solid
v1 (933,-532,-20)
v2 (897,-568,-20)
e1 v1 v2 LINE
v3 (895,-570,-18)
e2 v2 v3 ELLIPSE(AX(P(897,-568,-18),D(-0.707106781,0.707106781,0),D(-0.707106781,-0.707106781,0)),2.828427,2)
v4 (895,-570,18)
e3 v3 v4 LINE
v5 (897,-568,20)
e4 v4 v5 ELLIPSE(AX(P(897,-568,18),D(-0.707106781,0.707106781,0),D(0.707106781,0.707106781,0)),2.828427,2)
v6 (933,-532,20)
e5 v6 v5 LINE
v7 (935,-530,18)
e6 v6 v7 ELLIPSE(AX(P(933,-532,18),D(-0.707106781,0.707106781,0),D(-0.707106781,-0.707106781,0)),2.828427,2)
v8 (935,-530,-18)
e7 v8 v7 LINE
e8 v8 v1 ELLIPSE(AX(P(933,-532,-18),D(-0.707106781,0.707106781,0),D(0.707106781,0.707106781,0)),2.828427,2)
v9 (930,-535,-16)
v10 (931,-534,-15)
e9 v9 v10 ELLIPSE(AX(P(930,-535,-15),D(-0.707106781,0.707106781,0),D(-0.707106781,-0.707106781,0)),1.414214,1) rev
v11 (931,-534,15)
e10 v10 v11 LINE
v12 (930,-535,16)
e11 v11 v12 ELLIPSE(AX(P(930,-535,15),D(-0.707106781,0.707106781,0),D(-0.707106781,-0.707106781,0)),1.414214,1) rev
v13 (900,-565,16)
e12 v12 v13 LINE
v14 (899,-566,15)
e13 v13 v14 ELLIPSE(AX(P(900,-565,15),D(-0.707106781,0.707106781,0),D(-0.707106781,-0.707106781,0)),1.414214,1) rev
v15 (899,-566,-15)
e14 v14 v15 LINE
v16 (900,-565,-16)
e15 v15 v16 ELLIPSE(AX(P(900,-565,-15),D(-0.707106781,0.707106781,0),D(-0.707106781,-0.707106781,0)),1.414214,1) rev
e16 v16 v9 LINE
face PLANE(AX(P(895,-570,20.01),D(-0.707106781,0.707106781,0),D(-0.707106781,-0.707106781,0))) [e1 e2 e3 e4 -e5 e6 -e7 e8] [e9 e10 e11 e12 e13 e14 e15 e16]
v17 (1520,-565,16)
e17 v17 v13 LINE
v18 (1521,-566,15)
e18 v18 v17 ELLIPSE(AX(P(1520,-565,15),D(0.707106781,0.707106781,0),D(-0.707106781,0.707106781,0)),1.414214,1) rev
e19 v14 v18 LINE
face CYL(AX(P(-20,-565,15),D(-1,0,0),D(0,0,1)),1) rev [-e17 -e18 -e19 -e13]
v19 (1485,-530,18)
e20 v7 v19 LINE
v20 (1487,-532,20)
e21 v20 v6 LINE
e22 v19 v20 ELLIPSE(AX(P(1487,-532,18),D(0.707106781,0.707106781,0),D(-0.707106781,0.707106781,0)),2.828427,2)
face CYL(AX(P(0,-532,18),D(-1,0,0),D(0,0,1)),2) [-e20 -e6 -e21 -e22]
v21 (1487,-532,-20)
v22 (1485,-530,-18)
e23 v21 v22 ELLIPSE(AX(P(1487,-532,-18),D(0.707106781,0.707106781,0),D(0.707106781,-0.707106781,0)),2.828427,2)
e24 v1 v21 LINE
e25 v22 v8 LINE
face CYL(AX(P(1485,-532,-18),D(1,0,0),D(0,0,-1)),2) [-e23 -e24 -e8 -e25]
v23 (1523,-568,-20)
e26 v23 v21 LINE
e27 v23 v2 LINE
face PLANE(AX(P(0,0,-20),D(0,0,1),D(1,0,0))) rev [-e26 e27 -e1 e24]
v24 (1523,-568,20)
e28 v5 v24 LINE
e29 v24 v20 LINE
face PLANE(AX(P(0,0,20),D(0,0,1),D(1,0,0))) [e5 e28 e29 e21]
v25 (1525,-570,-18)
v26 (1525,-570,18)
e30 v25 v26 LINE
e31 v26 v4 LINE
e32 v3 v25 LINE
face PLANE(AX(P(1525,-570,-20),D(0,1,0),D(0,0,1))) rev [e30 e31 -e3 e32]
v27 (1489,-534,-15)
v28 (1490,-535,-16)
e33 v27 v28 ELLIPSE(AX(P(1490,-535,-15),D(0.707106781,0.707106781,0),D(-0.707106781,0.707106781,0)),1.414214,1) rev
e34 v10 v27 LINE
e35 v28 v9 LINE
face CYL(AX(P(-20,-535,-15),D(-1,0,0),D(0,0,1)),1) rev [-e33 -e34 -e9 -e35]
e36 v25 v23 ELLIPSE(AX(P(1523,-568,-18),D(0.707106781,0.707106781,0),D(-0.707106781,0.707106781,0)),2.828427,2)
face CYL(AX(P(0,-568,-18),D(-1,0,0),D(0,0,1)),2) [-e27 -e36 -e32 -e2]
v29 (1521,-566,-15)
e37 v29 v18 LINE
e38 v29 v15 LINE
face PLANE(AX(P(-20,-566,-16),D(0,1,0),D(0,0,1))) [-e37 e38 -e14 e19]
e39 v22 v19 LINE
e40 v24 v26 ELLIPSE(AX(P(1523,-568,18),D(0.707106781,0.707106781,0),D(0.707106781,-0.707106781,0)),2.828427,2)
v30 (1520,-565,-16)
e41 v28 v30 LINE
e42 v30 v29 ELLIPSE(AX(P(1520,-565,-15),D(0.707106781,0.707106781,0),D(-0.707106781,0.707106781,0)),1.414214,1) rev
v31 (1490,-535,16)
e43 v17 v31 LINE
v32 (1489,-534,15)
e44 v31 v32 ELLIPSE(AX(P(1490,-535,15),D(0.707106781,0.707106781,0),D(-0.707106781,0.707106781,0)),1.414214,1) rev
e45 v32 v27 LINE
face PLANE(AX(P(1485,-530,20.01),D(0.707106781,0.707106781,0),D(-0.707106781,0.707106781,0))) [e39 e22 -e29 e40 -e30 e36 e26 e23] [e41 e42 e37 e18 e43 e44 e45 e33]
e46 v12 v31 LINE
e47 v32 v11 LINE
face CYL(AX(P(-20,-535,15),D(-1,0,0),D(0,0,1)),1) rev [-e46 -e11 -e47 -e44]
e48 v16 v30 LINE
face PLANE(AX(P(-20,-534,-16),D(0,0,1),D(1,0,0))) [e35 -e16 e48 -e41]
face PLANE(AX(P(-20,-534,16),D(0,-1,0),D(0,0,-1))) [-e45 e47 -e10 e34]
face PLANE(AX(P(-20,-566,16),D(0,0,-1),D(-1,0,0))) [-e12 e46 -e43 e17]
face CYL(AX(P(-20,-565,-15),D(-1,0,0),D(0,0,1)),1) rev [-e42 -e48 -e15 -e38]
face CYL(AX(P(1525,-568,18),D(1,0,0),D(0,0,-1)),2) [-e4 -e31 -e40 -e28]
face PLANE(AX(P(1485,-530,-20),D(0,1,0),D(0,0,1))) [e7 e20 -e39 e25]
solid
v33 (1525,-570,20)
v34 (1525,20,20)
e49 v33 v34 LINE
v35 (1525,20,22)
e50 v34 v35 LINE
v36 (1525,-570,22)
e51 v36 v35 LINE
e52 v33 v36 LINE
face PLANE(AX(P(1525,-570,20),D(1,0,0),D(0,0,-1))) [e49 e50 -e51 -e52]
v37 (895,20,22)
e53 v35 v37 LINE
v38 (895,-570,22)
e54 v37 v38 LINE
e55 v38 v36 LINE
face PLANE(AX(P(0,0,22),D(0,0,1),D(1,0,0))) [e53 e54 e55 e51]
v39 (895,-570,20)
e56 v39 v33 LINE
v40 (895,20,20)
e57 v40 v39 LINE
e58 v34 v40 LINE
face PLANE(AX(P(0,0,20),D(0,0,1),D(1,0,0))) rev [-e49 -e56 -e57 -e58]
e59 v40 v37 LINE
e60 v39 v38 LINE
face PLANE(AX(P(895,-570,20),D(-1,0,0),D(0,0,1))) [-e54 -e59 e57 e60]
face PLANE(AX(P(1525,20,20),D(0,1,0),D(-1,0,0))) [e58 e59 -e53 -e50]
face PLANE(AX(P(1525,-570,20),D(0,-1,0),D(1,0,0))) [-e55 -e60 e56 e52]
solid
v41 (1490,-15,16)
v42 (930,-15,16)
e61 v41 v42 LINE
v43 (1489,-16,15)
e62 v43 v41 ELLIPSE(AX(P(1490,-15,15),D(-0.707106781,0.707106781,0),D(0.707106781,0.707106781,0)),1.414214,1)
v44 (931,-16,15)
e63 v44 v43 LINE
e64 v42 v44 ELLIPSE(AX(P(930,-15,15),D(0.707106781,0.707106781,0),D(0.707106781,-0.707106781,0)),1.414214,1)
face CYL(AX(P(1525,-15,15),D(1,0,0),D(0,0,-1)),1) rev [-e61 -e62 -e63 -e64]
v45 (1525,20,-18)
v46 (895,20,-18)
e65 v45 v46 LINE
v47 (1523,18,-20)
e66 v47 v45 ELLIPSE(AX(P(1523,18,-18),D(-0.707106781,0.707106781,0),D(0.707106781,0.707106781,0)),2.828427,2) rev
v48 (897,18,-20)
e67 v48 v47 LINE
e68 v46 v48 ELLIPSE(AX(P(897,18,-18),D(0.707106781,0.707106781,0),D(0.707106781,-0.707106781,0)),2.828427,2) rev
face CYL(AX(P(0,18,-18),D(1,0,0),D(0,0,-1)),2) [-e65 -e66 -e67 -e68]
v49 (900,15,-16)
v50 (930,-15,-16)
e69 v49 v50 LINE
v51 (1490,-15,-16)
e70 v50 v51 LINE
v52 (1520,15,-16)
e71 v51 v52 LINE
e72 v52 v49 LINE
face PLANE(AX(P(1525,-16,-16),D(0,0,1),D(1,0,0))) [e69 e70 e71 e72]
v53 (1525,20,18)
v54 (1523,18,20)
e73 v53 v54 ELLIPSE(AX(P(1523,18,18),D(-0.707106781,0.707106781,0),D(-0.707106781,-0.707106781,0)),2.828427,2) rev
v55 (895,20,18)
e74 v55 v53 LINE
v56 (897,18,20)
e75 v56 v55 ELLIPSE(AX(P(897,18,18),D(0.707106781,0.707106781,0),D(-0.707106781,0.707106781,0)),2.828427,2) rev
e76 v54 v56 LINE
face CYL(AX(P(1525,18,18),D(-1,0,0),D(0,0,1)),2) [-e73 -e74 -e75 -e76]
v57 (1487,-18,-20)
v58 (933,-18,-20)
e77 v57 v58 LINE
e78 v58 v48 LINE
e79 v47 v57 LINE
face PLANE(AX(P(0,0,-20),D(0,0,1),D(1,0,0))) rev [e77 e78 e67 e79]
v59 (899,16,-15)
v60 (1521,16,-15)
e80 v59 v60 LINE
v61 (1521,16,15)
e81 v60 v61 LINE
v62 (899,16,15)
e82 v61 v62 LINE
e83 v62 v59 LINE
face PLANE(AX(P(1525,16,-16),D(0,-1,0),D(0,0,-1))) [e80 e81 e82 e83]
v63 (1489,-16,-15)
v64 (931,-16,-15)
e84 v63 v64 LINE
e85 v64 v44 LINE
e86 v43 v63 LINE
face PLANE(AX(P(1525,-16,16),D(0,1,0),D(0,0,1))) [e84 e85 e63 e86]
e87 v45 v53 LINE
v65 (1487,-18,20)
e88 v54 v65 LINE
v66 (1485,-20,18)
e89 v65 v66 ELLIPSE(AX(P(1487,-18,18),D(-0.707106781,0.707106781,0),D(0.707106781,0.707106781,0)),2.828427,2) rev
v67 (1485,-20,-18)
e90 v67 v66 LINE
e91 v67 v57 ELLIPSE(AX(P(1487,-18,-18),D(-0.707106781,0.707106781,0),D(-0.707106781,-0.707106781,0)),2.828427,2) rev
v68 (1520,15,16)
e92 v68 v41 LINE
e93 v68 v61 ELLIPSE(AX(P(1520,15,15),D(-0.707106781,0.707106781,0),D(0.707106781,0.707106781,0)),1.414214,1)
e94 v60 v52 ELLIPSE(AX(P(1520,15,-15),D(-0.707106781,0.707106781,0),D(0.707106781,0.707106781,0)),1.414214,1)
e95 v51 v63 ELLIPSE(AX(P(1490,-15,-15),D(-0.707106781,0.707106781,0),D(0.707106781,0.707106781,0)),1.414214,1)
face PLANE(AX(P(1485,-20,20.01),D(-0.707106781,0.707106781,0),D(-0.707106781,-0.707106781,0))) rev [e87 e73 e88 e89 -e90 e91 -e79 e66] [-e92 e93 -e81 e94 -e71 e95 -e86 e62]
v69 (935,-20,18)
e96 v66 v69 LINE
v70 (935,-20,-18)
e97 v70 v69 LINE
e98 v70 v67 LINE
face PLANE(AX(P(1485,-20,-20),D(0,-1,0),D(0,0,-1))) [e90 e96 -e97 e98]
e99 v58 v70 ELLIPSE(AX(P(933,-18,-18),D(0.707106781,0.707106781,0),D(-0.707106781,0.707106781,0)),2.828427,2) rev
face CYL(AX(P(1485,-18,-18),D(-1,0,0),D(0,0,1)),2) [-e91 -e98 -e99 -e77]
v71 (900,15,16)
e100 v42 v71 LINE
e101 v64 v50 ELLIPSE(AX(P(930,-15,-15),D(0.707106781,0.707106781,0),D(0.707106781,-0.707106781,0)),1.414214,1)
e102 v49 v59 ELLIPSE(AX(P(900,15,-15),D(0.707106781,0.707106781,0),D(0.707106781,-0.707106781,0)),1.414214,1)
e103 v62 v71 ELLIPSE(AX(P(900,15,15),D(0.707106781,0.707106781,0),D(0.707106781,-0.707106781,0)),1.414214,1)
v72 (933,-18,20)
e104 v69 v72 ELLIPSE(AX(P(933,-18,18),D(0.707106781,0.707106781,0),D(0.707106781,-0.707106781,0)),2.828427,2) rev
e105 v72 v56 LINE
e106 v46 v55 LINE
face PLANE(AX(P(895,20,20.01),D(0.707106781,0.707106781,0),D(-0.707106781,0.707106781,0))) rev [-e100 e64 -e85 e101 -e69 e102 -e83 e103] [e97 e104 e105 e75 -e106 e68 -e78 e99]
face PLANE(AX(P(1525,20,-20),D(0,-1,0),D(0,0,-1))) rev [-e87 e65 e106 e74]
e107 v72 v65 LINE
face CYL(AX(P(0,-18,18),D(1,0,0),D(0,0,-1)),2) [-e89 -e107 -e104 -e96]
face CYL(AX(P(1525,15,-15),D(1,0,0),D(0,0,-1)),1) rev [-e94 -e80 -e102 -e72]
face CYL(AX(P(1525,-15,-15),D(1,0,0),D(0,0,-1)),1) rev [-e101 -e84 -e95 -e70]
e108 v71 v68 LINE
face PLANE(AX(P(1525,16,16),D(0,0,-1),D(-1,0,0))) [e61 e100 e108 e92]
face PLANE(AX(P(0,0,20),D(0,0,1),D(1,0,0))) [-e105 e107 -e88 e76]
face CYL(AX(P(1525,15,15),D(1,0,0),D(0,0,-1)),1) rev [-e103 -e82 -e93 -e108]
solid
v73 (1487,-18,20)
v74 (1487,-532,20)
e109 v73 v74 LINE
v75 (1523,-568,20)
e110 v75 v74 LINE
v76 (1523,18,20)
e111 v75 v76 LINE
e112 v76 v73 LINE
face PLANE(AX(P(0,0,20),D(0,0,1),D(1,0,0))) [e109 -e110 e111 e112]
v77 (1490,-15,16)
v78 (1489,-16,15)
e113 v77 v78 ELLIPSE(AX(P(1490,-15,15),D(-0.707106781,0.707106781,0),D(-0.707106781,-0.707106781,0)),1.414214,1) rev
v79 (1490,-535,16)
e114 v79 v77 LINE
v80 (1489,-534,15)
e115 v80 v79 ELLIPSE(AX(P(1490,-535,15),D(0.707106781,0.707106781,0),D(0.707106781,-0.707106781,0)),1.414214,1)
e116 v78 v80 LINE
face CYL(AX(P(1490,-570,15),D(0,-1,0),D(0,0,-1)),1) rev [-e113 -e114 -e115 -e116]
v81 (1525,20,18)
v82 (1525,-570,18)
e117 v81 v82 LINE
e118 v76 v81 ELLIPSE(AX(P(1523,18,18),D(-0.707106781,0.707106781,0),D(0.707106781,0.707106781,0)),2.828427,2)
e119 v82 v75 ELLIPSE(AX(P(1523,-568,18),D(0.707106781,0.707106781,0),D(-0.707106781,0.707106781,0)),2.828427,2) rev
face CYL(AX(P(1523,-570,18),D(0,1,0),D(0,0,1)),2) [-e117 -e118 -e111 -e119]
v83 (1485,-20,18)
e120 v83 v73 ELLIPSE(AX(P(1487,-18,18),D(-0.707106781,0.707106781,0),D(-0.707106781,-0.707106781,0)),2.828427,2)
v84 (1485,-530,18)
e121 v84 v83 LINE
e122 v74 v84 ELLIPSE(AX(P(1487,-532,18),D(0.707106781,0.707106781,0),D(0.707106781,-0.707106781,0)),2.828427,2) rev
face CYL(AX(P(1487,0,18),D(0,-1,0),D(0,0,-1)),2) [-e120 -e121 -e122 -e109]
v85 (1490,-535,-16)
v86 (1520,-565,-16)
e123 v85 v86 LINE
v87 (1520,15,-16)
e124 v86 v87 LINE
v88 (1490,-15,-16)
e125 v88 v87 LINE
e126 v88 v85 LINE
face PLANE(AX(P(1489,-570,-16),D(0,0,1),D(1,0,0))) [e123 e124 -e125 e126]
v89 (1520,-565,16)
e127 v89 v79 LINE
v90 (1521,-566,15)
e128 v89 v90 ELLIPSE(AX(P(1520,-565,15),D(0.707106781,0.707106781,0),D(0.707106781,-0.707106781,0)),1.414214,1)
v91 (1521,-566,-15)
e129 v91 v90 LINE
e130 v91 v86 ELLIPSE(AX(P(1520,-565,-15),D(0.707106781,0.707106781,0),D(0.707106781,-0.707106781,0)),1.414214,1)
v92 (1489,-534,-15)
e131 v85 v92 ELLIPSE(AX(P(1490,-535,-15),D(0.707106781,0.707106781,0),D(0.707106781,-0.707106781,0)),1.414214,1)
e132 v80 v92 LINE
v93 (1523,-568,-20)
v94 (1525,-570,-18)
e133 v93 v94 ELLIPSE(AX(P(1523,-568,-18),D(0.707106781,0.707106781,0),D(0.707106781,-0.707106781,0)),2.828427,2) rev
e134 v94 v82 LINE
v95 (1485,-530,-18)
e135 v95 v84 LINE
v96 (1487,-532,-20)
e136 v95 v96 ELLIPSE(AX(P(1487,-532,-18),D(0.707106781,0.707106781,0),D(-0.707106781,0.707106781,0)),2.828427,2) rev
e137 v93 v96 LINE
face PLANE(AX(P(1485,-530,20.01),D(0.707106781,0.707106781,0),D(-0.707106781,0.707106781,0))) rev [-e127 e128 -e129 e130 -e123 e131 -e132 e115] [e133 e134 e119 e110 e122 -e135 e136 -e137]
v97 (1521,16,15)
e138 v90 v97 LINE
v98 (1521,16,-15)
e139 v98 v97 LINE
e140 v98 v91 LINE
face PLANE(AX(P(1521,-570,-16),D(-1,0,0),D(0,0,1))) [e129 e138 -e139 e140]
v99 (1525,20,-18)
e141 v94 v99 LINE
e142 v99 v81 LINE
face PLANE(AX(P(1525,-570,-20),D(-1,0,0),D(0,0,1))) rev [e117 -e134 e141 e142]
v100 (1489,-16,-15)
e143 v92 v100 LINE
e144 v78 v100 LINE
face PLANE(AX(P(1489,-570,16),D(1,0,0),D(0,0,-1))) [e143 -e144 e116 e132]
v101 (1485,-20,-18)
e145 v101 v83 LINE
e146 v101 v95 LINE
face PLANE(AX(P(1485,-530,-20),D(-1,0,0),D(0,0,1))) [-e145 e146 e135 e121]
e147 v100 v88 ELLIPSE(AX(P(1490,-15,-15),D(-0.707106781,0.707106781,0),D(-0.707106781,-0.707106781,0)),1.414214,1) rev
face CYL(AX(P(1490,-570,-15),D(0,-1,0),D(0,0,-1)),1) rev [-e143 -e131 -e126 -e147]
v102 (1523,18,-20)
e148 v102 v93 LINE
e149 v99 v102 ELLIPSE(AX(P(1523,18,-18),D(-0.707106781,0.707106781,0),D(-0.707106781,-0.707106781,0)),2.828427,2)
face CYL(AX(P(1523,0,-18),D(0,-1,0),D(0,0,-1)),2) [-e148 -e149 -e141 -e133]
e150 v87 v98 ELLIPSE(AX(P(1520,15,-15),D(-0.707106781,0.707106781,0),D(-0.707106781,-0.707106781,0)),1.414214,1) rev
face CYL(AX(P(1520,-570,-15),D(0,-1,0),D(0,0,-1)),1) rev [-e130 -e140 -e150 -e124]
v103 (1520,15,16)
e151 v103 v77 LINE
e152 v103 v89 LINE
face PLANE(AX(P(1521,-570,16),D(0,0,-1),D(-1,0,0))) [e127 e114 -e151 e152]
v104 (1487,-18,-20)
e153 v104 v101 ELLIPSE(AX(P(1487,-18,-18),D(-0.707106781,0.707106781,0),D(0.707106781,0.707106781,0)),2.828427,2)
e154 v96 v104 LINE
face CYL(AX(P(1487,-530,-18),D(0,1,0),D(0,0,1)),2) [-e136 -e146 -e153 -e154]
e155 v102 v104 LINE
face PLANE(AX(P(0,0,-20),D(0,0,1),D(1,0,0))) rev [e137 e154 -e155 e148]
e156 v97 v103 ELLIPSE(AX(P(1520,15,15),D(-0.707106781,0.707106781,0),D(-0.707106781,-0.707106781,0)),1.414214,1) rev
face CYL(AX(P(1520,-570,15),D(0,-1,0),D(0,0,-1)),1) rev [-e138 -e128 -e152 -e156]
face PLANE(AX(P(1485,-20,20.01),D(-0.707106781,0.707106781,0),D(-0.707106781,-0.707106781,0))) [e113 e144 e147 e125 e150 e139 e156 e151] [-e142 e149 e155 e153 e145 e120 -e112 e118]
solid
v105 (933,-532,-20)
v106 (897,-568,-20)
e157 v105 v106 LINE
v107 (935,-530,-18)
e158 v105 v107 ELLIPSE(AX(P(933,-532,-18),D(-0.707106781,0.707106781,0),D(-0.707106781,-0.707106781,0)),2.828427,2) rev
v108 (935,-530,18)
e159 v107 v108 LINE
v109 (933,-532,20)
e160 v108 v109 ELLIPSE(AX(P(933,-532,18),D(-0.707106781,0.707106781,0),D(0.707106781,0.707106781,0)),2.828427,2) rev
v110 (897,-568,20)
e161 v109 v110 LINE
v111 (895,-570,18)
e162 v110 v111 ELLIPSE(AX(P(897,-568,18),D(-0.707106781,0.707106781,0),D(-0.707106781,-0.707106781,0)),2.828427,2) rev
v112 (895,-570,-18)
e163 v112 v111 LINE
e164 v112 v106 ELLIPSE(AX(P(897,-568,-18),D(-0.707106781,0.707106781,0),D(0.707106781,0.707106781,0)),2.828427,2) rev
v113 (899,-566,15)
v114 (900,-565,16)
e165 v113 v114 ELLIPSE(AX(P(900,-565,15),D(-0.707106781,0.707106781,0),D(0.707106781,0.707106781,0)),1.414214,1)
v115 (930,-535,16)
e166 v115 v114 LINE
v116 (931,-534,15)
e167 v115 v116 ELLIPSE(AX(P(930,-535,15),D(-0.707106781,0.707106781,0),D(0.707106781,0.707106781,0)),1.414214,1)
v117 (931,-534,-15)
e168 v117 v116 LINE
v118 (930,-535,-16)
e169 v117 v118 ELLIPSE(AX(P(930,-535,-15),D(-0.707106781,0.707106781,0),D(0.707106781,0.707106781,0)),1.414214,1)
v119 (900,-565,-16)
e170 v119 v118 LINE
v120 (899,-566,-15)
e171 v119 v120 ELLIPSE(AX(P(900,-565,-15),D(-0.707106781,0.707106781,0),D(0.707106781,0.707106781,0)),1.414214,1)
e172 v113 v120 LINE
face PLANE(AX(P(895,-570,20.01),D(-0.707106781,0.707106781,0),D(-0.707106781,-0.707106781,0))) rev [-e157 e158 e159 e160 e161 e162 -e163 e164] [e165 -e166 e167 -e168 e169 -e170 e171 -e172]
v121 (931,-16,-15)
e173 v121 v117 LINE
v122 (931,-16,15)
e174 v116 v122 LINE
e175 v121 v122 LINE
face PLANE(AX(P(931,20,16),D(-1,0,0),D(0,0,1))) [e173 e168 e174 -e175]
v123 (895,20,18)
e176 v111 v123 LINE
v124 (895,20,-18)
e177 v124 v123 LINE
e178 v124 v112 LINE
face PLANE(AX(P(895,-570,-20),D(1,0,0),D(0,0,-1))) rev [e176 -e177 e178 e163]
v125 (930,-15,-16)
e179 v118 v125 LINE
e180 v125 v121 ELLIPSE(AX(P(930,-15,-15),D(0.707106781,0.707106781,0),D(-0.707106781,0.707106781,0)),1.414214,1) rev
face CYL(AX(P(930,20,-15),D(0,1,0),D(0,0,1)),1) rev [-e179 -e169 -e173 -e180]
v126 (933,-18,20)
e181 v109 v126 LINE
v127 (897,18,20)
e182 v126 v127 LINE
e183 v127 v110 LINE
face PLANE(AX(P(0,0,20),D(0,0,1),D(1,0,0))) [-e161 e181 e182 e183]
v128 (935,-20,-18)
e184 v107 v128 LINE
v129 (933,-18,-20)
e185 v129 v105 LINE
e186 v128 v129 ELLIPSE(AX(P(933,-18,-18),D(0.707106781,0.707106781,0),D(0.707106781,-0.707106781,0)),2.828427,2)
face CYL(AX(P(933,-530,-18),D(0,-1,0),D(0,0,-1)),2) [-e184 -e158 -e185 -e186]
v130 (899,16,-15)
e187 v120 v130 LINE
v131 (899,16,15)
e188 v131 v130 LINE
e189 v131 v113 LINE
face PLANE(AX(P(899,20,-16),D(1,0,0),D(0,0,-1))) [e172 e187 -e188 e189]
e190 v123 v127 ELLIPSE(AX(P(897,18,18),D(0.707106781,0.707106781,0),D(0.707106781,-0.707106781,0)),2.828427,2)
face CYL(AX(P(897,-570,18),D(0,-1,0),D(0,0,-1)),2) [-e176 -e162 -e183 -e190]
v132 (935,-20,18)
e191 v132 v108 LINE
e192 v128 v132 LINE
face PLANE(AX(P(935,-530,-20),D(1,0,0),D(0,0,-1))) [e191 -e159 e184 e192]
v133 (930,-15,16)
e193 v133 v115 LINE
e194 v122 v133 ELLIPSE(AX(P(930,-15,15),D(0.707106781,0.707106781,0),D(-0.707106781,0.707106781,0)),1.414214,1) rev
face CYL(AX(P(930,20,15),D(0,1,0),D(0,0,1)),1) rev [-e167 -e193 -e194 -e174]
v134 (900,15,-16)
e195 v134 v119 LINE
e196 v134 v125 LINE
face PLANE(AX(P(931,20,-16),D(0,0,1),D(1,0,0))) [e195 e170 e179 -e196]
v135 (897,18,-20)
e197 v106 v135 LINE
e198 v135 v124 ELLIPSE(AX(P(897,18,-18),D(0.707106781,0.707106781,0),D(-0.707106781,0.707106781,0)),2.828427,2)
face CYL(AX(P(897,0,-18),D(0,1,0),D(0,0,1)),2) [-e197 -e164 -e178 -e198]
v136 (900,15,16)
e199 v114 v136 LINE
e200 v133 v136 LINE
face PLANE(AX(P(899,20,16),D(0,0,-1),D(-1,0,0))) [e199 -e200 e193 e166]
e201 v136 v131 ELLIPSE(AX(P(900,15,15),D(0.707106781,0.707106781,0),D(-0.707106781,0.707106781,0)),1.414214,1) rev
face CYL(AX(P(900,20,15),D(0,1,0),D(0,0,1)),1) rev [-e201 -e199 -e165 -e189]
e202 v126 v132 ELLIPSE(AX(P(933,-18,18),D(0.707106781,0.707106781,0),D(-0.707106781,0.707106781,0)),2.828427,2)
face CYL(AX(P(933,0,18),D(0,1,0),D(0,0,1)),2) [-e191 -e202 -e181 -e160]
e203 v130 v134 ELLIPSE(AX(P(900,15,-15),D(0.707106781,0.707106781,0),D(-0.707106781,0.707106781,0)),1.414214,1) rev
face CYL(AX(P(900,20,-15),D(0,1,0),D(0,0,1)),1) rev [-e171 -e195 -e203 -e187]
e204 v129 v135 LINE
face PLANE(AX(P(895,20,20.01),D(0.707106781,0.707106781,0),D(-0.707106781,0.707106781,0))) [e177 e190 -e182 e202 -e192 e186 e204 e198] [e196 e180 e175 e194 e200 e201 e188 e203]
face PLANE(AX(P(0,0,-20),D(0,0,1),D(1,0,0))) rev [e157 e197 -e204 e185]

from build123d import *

# Parameters (mm, degrees)
SKETCH_1_W                 = 630
SKETCH_1_H                 = 590
SM_BASE_FLANGE_1_DEPTH     = 2
SKETCH_4_W                 = 630
SKETCH_4_H                 = 590
SKETCH_4_W_2               = 550
SKETCH_4_H_2               = 510
EXTRUDE_1_DEPTH            = 40
SPLIT_START                = 229
SPLIT_BODIES_1_OUTLINE_W   = 418.911434438
SPLIT_BODIES_1_OUTLINE_H   = 40
SPLIT_BODIES_1_DEPTH       = 864
SPLIT_START_2              = 675.286976033
SPLIT_BODIES_1_2_OUTLINE_W = 447.088565562
SPLIT_BODIES_1_2_OUTLINE_H = 40
SPLIT_BODIES_1_2_DEPTH     = 417.713023967
SPLIT_START_3              = -20
SPLIT_BODIES_1_3_DEPTH     = 40
SPLIT_BODIES_1_4_DEPTH     = 40
SPLIT_BODIES_1_5_DEPTH     = 40
CUT_EXTRUDE_1_DEPTH        = 865.060183089
CUT_EXTRUDE_1_DEPTH_BACK   = 865.060183089
SKETCH_6_W                 = 32
SKETCH_6_H                 = 32
CUT_EXTRUDE_2_DEPTH        = 865.060183089
CUT_EXTRUDE_2_DEPTH_BACK   = 865.060183089
SKETCH_7_W                 = 32
SKETCH_7_H                 = 32
CUT_EXTRUDE_3_DEPTH        = 865.060183089
CUT_EXTRUDE_3_DEPTH_BACK   = 865.060183089
SKETCH_8_W                 = 32
SKETCH_8_H                 = 32
CUT_EXTRUDE_4_DEPTH        = 865.060183089
CUT_EXTRUDE_4_DEPTH_BACK   = 865.060183089
SKETCH_9_W                 = 32
SKETCH_9_H                 = 32
FILLET_1_R                 = 2
FILLET_2_R                 = 1
FILLET_3_R                 = 2
FILLET_4_R                 = 1
FILLET_5_R                 = 2
FILLET_6_R                 = 1
FILLET_7_R                 = 2
FILLET_8_R                 = 1


with BuildPart() as part:
    # 基体-法兰1: sheet metal written as solids
    # Sketch 1 → 基体-法兰1 (new body)
    with BuildSketch(Plane.XY.offset(22)):
        with Locations((1210, -275)):
            Rectangle(SKETCH_1_W, SKETCH_1_H)
    extrude(amount=-SM_BASE_FLANGE_1_DEPTH)


with BuildPart() as body_2:
    # 草图4 → 凸台-拉伸1 (new body)
    with BuildSketch(Plane(origin=(0, 0, 20), x_dir=(-1, 0, 0), z_dir=(0, 0, -1))):
        with Locations((-1210, -275)):
            Rectangle(SKETCH_4_W, SKETCH_4_H)
        with Locations((-1210, -275)):
            Rectangle(SKETCH_4_W_2, SKETCH_4_H_2, mode=Mode.SUBTRACT)
    extrude(amount=EXTRUDE_1_DEPTH)

    # Split Bodies 1: read off the stored shape, not the designer's step
    # Split Bodies 1 outline → Split Bodies 1 (cut)
    with BuildSketch(Plane(origin=(0, 0, 0), x_dir=(0.707106781186546, -0.707106781186549, 0), z_dir=(0.707106781186549, 0.707106781186546, 0)).offset(SPLIT_START)):
        with Locations((826.455717219, 0)):
            Rectangle(SPLIT_BODIES_1_OUTLINE_W, SPLIT_BODIES_1_OUTLINE_H)
    extrude(amount=SPLIT_BODIES_1_DEPTH, mode=Mode.SUBTRACT)

    # Split Bodies 1 2 outline → Split Bodies 1 2 (cut)
    with BuildSketch(Plane(origin=(0, 0, 0), x_dir=(0.707106781186546, -0.707106781186549, 0), z_dir=(0.707106781186549, 0.707106781186546, 0)).offset(SPLIT_START_2)):
        with Locations((1259.455717219, 0)):
            Rectangle(SPLIT_BODIES_1_2_OUTLINE_W, SPLIT_BODIES_1_2_OUTLINE_H)
    extrude(amount=SPLIT_BODIES_1_2_DEPTH, mode=Mode.SUBTRACT)

    # 草图6 → 切除-拉伸1 (cut, two sides: drawn at the far end of the back side and taken through both)
    with BuildSketch(Plane(origin=(1525, -570, 20), x_dir=(0, 0, 1), z_dir=(-1, 0, 0)).offset(-CUT_EXTRUDE_1_DEPTH_BACK)):
        with Locations((-20, 20)):
            Rectangle(SKETCH_6_W, SKETCH_6_H)
    extrude(amount=CUT_EXTRUDE_1_DEPTH + CUT_EXTRUDE_1_DEPTH_BACK, mode=Mode.SUBTRACT)

    # 圆角1
    fillet_1_edges = [body_2.edges().sort_by_distance(p)[0] for p in [
        (1210, -530, 20),
        (1210, -530, -20),
        (1210, -570, 20),
        (1210, -570, -20),
    ]]
    fillet(fillet_1_edges, radius=FILLET_1_R)

    # 圆角2
    fillet_2_edges = [body_2.edges().sort_by_distance(p)[0] for p in [
        (1210, -566, -16),
        (1210, -566, 16),
        (1210, -534, 16),
        (1210, -534, -16),
    ]]
    fillet(fillet_2_edges, radius=FILLET_2_R)


with BuildPart() as body_3:
    # Split Bodies 1 3 outline → Split Bodies 1 3 (new body)
    with BuildSketch(Plane.XY.offset(SPLIT_START_3)):
        Polygon((895, 20), (935, -20), (1485, -20), (1525, 20), align=None)
    extrude(amount=SPLIT_BODIES_1_3_DEPTH)

    # 草图9 → 切除-拉伸4 (cut, two sides: drawn at the far end of the back side and taken through both)
    with BuildSketch(Plane(origin=(895, 20, 20), x_dir=(0, 0, -1), z_dir=(1, 0, 0)).offset(-CUT_EXTRUDE_4_DEPTH_BACK)):
        with Locations((20, -20)):
            Rectangle(SKETCH_9_W, SKETCH_9_H)
    extrude(amount=CUT_EXTRUDE_4_DEPTH + CUT_EXTRUDE_4_DEPTH_BACK, mode=Mode.SUBTRACT)

    # 圆角7
    fillet_7_edges = [body_3.edges().sort_by_distance(p)[0] for p in [
        (1210, -20, 20),
        (1210, -20, -20),
        (1210, 20, 20),
        (1210, 20, -20),
    ]]
    fillet(fillet_7_edges, radius=FILLET_7_R)

    # 圆角8
    fillet_8_edges = [body_3.edges().sort_by_distance(p)[0] for p in [
        (1210, 16, -16),
        (1210, 16, 16),
        (1210, -16, 16),
        (1210, -16, -16),
    ]]
    fillet(fillet_8_edges, radius=FILLET_8_R)


with BuildPart() as body_4:
    # Split Bodies 1 4 outline → Split Bodies 1 4 (new body)
    with BuildSketch(Plane.XY.offset(SPLIT_START_3)):
        Polygon((1485, -530), (1525, -570), (1525, 20), (1485, -20), align=None)
    extrude(amount=SPLIT_BODIES_1_4_DEPTH)

    # 草图7 → 切除-拉伸2 (cut, two sides: drawn at the far end of the back side and taken through both)
    with BuildSketch(Plane(origin=(1525, 20, 20), x_dir=(-1, 0, 0), z_dir=(0, -1, 0)).offset(-CUT_EXTRUDE_2_DEPTH_BACK)):
        with Locations((20, 20)):
            Rectangle(SKETCH_7_W, SKETCH_7_H)
    extrude(amount=CUT_EXTRUDE_2_DEPTH + CUT_EXTRUDE_2_DEPTH_BACK, mode=Mode.SUBTRACT)

    # 圆角3
    fillet_3_edges = [body_4.edges().sort_by_distance(p)[0] for p in [
        (1485, -275, 20),
        (1485, -275, -20),
        (1525, -275, 20),
        (1525, -275, -20),
    ]]
    fillet(fillet_3_edges, radius=FILLET_3_R)

    # 圆角4
    fillet_4_edges = [body_4.edges().sort_by_distance(p)[0] for p in [
        (1521, -275, -16),
        (1521, -275, 16),
        (1489, -275, 16),
        (1489, -275, -16),
    ]]
    fillet(fillet_4_edges, radius=FILLET_4_R)


with BuildPart() as body_5:
    # Split Bodies 1 5 outline → Split Bodies 1 5 (new body)
    with BuildSketch(Plane.XY.offset(SPLIT_START_3)):
        Polygon((895, -570), (935, -530), (935, -20), (895, 20), align=None)
    extrude(amount=SPLIT_BODIES_1_5_DEPTH)

    # 草图8 → 切除-拉伸3 (cut, two sides: drawn at the far end of the back side and taken through both)
    with BuildSketch(Plane(origin=(895, -570, 20), x_dir=(1, 0, 0), z_dir=(0, 1, 0)).offset(-CUT_EXTRUDE_3_DEPTH_BACK)):
        with Locations((20, 20)):
            Rectangle(SKETCH_8_W, SKETCH_8_H)
    extrude(amount=CUT_EXTRUDE_3_DEPTH + CUT_EXTRUDE_3_DEPTH_BACK, mode=Mode.SUBTRACT)

    # 圆角5
    fillet_5_edges = [body_5.edges().sort_by_distance(p)[0] for p in [
        (935, -275, 20),
        (935, -275, -20),
        (895, -275, -20),
        (895, -275, 20),
    ]]
    fillet(fillet_5_edges, radius=FILLET_5_R)

    # 圆角6
    fillet_6_edges = [body_5.edges().sort_by_distance(p)[0] for p in [
        (899, -275, -16),
        (899, -275, 16),
        (931, -275, 16),
        (931, -275, -16),
    ]]
    fillet(fillet_6_edges, radius=FILLET_6_R)


solid = Compound([part.part, body_2.part, body_3.part, body_4.part, body_5.part])
